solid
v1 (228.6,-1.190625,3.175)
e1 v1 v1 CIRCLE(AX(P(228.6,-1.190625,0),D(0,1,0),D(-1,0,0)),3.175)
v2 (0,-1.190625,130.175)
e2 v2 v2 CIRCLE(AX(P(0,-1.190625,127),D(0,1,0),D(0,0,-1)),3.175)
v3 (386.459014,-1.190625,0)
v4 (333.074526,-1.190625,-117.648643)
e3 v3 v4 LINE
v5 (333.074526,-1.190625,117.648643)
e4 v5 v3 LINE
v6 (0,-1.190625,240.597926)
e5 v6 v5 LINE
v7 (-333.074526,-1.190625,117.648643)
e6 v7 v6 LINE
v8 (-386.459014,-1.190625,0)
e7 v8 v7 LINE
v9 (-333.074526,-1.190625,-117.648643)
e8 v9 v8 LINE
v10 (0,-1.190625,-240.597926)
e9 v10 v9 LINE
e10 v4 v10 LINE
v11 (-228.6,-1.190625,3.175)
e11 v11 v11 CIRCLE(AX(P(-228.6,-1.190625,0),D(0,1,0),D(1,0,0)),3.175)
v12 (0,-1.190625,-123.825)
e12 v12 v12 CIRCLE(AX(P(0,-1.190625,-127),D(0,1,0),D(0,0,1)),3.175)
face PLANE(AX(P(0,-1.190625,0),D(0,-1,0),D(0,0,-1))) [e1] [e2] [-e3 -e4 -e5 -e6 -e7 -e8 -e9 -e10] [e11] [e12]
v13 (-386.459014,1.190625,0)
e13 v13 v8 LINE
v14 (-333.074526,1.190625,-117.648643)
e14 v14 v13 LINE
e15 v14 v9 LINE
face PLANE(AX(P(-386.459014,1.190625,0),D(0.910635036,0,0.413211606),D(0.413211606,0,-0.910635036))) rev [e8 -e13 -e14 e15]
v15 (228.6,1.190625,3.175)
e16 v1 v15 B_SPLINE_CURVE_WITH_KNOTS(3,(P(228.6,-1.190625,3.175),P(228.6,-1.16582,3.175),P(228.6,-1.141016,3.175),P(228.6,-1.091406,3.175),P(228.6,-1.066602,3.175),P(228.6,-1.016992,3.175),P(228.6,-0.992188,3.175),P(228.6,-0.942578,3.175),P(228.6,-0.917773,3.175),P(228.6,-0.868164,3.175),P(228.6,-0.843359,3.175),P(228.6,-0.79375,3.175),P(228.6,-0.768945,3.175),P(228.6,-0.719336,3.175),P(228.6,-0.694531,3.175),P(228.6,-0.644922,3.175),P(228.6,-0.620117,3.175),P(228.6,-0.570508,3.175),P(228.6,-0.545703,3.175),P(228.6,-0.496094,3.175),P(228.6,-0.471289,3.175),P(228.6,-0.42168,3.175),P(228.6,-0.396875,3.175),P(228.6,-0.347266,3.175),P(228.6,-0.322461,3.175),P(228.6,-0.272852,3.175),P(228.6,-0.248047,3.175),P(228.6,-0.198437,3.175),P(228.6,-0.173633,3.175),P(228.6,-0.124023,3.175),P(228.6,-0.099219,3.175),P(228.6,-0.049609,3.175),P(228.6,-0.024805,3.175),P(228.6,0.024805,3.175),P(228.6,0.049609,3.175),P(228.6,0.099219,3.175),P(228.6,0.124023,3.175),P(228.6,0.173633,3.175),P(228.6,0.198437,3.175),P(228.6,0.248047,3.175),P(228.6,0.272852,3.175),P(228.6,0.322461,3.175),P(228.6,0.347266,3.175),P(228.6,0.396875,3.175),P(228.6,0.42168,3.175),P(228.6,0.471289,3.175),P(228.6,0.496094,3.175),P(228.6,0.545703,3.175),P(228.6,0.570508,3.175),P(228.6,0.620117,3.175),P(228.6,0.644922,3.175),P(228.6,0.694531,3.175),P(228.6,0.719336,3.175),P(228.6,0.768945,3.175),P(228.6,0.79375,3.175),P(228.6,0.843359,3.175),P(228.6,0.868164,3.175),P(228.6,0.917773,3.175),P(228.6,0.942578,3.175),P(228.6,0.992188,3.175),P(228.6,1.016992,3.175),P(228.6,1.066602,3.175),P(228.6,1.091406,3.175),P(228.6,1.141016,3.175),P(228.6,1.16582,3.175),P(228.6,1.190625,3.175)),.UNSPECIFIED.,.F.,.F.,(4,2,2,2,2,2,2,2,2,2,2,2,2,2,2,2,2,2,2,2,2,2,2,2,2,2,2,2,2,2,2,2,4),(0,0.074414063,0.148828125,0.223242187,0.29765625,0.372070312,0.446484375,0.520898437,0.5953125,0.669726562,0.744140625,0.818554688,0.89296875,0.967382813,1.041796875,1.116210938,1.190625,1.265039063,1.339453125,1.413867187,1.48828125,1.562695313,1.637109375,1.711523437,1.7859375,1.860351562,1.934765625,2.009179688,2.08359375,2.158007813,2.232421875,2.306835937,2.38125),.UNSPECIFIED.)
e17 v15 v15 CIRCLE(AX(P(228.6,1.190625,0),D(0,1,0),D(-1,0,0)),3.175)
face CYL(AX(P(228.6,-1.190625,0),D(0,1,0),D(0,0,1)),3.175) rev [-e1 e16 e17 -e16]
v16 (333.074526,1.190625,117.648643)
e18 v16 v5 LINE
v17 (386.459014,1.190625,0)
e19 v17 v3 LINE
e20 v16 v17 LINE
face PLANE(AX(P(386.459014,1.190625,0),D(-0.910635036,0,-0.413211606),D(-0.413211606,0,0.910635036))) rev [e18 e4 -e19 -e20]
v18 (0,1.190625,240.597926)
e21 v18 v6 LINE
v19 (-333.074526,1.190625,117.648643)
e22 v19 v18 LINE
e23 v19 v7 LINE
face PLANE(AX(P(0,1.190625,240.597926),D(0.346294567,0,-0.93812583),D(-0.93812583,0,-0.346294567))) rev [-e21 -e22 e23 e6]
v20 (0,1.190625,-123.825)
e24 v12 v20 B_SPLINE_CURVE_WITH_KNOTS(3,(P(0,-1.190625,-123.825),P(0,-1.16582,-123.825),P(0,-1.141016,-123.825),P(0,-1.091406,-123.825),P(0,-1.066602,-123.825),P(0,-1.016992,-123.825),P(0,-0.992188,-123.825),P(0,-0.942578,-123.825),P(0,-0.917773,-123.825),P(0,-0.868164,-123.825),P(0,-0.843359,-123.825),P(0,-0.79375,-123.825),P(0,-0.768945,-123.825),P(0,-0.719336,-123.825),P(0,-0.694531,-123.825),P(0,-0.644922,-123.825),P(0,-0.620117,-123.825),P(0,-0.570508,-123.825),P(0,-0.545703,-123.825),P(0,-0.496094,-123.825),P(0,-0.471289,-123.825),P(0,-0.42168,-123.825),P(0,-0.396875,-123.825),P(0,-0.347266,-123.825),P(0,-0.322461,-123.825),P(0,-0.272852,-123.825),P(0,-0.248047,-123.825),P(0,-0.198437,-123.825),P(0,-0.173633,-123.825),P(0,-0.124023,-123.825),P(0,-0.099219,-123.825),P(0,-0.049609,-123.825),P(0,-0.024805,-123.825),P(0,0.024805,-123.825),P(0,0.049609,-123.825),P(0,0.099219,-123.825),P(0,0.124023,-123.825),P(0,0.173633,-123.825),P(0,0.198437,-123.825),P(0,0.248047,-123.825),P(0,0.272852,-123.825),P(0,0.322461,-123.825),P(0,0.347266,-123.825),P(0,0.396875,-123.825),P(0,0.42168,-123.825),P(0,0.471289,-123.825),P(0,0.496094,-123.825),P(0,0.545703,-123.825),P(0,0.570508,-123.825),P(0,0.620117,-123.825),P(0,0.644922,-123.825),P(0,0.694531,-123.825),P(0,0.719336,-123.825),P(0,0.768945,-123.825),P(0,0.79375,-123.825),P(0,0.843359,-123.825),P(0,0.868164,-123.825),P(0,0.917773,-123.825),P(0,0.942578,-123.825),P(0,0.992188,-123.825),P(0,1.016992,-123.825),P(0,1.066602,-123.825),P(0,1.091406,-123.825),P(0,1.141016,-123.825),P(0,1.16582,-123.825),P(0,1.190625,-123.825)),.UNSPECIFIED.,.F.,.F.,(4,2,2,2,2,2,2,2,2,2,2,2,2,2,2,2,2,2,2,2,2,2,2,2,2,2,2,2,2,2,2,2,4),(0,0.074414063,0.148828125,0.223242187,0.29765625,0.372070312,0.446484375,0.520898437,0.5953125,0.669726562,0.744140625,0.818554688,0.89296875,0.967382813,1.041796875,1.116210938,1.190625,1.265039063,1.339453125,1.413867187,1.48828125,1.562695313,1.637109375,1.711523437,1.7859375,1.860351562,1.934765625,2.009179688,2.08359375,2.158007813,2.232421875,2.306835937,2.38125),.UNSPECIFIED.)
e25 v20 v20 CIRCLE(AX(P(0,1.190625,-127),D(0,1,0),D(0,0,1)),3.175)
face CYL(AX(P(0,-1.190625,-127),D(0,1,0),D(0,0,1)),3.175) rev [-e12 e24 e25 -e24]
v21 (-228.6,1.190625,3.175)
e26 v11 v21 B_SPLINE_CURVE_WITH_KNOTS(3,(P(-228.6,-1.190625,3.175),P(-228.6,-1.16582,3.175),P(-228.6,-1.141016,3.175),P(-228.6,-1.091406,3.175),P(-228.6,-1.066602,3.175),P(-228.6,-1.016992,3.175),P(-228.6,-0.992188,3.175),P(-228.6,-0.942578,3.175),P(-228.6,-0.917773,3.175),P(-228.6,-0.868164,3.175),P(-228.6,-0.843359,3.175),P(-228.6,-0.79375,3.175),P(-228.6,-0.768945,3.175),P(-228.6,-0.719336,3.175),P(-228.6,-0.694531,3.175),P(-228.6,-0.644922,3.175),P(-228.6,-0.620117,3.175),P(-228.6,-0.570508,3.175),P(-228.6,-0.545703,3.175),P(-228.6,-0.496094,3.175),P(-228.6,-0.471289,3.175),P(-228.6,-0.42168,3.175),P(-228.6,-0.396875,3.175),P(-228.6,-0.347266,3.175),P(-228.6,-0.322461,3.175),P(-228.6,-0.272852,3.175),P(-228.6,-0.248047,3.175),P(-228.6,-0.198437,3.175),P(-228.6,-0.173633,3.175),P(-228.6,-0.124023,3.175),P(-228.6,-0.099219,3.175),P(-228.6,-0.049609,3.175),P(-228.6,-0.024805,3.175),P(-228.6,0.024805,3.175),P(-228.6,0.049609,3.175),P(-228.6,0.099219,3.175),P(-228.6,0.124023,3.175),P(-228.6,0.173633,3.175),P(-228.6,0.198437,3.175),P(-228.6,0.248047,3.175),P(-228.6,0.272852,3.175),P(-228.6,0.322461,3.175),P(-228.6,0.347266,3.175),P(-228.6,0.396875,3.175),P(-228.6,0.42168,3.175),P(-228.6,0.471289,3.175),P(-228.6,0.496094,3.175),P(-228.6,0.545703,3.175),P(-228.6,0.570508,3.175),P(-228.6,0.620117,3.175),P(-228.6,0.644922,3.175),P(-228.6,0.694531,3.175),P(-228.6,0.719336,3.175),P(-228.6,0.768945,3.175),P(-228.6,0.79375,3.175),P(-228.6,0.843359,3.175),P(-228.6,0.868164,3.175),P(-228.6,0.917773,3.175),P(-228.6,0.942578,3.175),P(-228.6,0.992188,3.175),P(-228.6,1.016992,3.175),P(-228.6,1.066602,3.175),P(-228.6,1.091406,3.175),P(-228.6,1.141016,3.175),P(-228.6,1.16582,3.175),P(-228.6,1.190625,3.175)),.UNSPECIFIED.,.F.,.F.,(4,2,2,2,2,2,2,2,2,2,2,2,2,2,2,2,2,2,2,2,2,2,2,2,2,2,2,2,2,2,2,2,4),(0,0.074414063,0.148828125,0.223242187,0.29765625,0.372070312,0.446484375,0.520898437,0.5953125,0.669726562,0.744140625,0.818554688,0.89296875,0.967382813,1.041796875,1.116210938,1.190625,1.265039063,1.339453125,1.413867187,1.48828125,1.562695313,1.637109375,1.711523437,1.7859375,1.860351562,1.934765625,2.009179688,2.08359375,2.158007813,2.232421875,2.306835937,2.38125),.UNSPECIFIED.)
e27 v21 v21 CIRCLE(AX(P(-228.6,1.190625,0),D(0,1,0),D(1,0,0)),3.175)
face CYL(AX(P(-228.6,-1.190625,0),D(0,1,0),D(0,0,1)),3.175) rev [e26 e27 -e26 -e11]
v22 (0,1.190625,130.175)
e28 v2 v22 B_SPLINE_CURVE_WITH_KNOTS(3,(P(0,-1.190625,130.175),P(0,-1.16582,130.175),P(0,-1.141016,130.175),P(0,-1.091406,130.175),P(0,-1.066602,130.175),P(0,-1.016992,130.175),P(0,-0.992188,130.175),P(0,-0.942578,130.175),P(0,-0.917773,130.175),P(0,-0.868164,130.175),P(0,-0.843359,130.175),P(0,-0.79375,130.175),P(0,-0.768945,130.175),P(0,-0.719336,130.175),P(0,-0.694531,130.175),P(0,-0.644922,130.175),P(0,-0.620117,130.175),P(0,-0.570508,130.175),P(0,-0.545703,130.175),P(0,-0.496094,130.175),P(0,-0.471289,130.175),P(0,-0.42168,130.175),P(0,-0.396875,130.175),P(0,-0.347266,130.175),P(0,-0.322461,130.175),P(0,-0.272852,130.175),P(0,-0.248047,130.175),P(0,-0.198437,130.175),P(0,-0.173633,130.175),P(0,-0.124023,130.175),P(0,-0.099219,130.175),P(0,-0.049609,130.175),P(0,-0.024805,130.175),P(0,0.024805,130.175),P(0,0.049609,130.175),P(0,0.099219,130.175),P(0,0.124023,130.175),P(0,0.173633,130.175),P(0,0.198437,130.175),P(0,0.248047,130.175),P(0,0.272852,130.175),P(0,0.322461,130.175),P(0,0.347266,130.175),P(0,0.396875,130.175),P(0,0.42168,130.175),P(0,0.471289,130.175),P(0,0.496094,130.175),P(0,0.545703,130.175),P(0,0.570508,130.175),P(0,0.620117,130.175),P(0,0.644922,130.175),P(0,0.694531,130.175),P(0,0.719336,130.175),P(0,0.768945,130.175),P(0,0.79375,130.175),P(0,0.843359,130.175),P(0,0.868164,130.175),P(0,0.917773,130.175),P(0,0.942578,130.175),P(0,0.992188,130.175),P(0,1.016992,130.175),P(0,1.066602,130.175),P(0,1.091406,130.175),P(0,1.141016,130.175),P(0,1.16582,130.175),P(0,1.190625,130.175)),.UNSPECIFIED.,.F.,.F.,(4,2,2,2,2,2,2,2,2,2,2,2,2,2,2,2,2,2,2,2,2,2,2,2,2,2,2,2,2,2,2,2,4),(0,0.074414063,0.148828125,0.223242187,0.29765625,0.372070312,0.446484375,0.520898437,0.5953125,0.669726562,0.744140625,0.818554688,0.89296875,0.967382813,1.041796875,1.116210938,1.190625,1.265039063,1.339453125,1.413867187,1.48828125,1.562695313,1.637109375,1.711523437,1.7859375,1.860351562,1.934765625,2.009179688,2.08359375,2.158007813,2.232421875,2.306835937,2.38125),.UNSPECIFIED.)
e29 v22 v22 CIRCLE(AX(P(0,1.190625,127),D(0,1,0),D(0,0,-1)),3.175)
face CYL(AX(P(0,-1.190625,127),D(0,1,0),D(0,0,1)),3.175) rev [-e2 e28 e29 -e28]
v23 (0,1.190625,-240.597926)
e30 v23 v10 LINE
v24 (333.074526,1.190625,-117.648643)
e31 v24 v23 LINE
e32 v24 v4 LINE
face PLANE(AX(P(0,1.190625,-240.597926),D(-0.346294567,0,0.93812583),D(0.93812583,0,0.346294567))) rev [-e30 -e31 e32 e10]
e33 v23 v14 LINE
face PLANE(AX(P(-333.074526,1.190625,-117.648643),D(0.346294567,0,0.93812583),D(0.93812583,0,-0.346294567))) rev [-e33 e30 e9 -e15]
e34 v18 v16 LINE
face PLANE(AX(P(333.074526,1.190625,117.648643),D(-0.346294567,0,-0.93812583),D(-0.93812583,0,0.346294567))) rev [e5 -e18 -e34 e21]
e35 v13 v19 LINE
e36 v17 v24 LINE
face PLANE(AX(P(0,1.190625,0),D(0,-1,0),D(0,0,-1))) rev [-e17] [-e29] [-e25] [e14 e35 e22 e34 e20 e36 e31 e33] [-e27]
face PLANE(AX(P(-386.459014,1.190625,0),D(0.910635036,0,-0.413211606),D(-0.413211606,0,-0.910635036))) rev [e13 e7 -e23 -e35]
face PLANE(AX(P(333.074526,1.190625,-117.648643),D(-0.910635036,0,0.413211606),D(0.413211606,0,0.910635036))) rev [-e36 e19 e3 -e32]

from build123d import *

# Parameters (mm, degrees)
BOSS_EXTRUDE1_DEPTH   = 1.190625
SKETCH2_R             = 3.175
CUT_EXTRUDE1_DEPTH    = 456.240158496
CRVPATTERN1_START     = -1.190625
CRVPATTERN1_OUTLINE_R = 3.175
CRVPATTERN1_DEPTH     = 2.38125


# Read off the part's stored shape, not the designer's step: CrvPattern1
with BuildPart() as part:
    # Sketch1 → Boss-Extrude1 (new, symmetric)
    with BuildSketch(Plane(origin=(0, 0, 0), x_dir=(1, 0, 0), z_dir=(0, 1, 0))):
        Polygon((-333.074526413, 117.648642651), (0, 240.597926469), (333.074526413, 117.648642651), (386.459013784, 0), (333.074526413, -117.648642651), (0, -240.597926469), (-333.074526413, -117.648642651), (-386.459013784, 0), align=None)
    extrude(amount=BOSS_EXTRUDE1_DEPTH, both=True)

    # Sketch2 → Cut-Extrude1 (cut, through all)
    with BuildSketch(Plane(origin=(0, 1.190625, 0), x_dir=(1, 0, 0), z_dir=(0, 1, 0))):
        with Locations(Location((0, 127, 0), (0, 0, 270))):
            Circle(SKETCH2_R)
    extrude(amount=-CUT_EXTRUDE1_DEPTH, mode=Mode.SUBTRACT)

    # CrvPattern1 outline → CrvPattern1 (cut)
    with BuildSketch(Plane(origin=(0, 0, 0), x_dir=(1, 0, 0), z_dir=(0, 1, 0)).offset(CRVPATTERN1_START)):
        with Locations((-228.6, 0)):
            Circle(CRVPATTERN1_OUTLINE_R)
        with Locations((0, -127)):
            Circle(CRVPATTERN1_OUTLINE_R)
        with Locations((228.6, 0)):
            Circle(CRVPATTERN1_OUTLINE_R)
    extrude(amount=CRVPATTERN1_DEPTH, mode=Mode.SUBTRACT)


solid = part.part
